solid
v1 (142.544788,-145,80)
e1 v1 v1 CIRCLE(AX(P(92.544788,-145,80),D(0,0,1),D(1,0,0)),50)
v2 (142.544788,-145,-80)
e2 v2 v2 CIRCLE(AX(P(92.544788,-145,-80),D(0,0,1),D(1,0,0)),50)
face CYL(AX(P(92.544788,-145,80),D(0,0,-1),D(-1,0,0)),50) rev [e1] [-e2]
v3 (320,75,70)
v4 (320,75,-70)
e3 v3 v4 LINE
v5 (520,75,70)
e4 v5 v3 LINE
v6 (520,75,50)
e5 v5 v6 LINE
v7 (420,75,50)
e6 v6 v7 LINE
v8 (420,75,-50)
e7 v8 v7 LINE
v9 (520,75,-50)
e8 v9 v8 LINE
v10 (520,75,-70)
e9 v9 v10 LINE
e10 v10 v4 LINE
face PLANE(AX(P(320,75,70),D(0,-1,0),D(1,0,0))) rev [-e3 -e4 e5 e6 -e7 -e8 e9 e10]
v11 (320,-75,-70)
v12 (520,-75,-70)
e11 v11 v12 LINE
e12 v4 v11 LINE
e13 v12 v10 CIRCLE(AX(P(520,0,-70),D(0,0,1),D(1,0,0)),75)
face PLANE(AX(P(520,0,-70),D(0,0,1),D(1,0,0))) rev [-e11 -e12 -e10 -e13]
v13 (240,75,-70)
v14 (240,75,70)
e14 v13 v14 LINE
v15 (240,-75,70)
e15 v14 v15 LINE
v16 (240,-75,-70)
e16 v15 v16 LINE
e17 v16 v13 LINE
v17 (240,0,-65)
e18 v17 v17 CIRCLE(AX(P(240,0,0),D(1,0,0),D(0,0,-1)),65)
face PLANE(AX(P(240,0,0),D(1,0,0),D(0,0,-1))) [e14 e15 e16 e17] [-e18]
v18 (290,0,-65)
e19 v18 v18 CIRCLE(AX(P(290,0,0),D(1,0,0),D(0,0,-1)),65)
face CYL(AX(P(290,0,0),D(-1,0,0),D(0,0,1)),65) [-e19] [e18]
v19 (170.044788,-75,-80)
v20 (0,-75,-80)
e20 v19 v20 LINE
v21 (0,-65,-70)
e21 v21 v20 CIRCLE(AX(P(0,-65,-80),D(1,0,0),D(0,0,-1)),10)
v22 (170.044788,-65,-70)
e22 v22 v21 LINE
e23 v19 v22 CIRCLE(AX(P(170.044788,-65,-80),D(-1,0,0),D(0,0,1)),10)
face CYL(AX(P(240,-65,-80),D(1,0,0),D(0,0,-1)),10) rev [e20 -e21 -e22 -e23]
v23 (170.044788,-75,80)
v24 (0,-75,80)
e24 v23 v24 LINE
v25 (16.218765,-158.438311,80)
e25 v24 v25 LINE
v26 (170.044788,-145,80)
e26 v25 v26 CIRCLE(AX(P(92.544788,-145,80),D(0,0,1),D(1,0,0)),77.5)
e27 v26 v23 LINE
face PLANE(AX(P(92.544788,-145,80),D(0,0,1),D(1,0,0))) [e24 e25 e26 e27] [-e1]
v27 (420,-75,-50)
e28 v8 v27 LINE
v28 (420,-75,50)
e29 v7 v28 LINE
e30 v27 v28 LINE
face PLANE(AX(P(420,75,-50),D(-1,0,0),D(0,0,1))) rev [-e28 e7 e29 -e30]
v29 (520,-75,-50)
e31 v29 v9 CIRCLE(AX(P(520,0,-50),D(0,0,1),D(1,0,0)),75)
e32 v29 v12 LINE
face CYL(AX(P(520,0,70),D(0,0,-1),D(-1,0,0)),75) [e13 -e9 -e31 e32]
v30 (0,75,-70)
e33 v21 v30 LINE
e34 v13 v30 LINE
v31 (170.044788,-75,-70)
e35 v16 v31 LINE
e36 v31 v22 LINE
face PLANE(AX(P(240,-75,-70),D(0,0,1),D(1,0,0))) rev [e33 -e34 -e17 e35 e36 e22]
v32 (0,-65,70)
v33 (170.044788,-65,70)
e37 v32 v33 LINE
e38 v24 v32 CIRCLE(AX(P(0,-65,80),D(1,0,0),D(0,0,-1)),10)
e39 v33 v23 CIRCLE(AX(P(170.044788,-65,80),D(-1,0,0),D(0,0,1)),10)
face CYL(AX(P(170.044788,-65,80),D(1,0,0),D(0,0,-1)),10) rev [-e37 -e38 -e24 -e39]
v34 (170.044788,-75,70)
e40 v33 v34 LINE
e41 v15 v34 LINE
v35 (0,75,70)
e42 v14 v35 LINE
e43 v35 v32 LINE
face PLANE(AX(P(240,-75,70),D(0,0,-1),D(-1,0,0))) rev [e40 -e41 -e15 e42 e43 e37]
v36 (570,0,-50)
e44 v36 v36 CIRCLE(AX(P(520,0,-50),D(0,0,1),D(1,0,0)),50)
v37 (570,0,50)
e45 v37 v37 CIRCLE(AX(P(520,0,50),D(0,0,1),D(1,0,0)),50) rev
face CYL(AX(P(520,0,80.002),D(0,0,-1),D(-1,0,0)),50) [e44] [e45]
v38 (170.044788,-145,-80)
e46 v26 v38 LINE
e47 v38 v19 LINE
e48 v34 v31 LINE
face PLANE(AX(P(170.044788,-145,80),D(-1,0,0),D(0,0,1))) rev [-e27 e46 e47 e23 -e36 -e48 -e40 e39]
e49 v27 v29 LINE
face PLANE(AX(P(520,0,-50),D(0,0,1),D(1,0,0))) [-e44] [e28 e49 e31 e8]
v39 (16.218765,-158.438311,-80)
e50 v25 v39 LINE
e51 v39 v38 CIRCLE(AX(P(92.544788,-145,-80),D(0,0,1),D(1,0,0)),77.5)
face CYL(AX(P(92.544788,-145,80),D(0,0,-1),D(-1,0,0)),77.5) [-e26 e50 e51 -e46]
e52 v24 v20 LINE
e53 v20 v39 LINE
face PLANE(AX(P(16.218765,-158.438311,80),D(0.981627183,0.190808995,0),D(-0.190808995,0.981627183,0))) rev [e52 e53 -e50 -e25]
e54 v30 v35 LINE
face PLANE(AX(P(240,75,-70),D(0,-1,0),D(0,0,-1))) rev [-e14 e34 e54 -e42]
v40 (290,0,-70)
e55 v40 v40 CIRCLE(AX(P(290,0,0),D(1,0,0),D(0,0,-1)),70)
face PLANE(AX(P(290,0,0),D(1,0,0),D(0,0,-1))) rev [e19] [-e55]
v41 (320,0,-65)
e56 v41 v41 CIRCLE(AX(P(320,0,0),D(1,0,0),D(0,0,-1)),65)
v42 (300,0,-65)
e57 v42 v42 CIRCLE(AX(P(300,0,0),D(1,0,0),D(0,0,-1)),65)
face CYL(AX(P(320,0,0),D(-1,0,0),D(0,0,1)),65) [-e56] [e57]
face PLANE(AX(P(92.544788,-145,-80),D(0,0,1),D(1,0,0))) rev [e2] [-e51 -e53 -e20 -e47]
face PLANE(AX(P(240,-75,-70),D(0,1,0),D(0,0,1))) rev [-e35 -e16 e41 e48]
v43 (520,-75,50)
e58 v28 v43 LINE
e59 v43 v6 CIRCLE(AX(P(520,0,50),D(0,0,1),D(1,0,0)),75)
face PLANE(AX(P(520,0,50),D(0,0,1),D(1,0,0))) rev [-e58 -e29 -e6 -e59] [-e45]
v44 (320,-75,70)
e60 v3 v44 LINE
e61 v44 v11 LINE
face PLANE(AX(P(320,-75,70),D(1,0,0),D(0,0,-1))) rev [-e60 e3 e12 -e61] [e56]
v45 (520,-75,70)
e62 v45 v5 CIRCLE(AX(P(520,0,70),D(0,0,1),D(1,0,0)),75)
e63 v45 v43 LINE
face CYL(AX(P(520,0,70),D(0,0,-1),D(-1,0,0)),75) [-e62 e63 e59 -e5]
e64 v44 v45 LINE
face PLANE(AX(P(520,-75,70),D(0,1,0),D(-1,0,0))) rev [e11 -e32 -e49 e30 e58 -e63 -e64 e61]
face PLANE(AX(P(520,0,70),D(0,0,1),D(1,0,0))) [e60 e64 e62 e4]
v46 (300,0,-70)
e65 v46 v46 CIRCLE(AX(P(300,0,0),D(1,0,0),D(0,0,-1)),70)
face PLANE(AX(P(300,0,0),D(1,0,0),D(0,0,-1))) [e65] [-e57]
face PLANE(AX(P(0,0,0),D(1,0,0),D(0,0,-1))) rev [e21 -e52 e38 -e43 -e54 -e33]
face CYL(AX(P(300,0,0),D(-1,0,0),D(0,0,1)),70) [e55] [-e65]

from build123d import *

# Parameters (mm, degrees)
SKETCH2_W           = 140
SKETCH2_H           = 150
BOSS_EXTRUDE1_DEPTH = 240
SKETCH3_R           = 65
BOSS_EXTRUDE2_DEPTH = 50
SKETCH4_R           = 70
BOSS_EXTRUDE3_DEPTH = 10
SKETCH5_R           = 50
BOSS_EXTRUDE4_DEPTH = 80
FILLET1_R           = 10
SKETCH6_R           = 65
BOSS_EXTRUDE5_DEPTH = 20
BOSS_EXTRUDE6_DEPTH = 70
CUT_EXTRUDE1_DEPTH  = 50
BOSS_EXTRUDE7_REACH = 650.407
SKETCH9_R           = 50


with BuildPart() as part:
    # Sketch2 → Boss-Extrude1 (new body)
    with BuildSketch(Plane(origin=(0, 0, 0), x_dir=(0, 0, -1), z_dir=(1, 0, 0))):
        Rectangle(SKETCH2_W, SKETCH2_H)
    extrude(amount=BOSS_EXTRUDE1_DEPTH)

    # Sketch3 → Boss-Extrude2 (add)
    with BuildSketch(Plane(origin=(240, 0, 0), x_dir=(0, 0, -1), z_dir=(1, 0, 0))):
        Circle(SKETCH3_R)
    extrude(amount=BOSS_EXTRUDE2_DEPTH)

    # Sketch4 → Boss-Extrude3 (add)
    with BuildSketch(Plane(origin=(290, 0, 0), x_dir=(0, 0, -1), z_dir=(1, 0, 0))):
        Circle(SKETCH4_R)
    extrude(amount=BOSS_EXTRUDE3_DEPTH)

    # Sketch5 → Boss-Extrude4 (add, symmetric)
    with BuildSketch(Plane.XY):
        with BuildLine():
            Line((170.044787747, -145), (170.044787747, -75))
            Line((170.044787747, -75), (0, -75))
            Line((0, -75), (16.218764607, -158.438310593))
            ThreePointArc((16.218764607, -158.438310593), (99.289534096, -222.205947936), (170.044787747, -145))
        make_face()
        with Locations((92.544787747, -145)):
            Circle(SKETCH5_R, mode=Mode.SUBTRACT)
    extrude(amount=BOSS_EXTRUDE4_DEPTH, both=True)

    # Fillet1
    fillet1_edges = [part.edges().sort_by_distance(p)[0] for p in [
        (85.022393874, -75, -70),
        (85.022393874, -75, 70),
    ]]
    fillet(fillet1_edges, radius=FILLET1_R - 0.0001)  # a hair under: the kernel refuses the full size

    # Sketch6 → Boss-Extrude5 (add)
    with BuildSketch(Plane(origin=(300, 0, 0), x_dir=(0, 0, -1), z_dir=(1, 0, 0))):
        Circle(SKETCH6_R)
    extrude(amount=BOSS_EXTRUDE5_DEPTH)

    # Sketch7 → Boss-Extrude6 (add, symmetric)
    with BuildSketch(Plane.XY):
        with BuildLine():
            Line((520, -75), (320, -75))
            Line((320, -75), (320, 75))
            Line((320, 75), (520, 75))
            ThreePointArc((520, 75), (595, 0), (520, -75))
        make_face()
    extrude(amount=BOSS_EXTRUDE6_DEPTH, both=True)

    # Sketch8 → Cut-Extrude1 (cut, symmetric)
    with BuildSketch(Plane.XY):
        with BuildLine():
            Line((520, 75), (420, 75))
            Line((420, 75), (420, -75))
            Line((420, -75), (520, -75))
            ThreePointArc((520, -75), (595, 0), (520, 75))
        make_face()
    extrude(amount=CUT_EXTRUDE1_DEPTH, both=True, mode=Mode.SUBTRACT)

    # Sketch9 → Boss-Extrude7 (add, up to next)
    with BuildSketch(Plane.XY.offset(-50), mode=Mode.PRIVATE) as boss_extrude7_sk1:
        with Locations((520, 0)):
            Circle(SKETCH9_R)
    boss_extrude7_tool1 = extrude(boss_extrude7_sk1.sketch, amount=BOSS_EXTRUDE7_REACH, mode=Mode.PRIVATE) - part.part
    add(boss_extrude7_tool1.solids().sort_by_distance((520, 0, -50))[0])


solid = part.part
